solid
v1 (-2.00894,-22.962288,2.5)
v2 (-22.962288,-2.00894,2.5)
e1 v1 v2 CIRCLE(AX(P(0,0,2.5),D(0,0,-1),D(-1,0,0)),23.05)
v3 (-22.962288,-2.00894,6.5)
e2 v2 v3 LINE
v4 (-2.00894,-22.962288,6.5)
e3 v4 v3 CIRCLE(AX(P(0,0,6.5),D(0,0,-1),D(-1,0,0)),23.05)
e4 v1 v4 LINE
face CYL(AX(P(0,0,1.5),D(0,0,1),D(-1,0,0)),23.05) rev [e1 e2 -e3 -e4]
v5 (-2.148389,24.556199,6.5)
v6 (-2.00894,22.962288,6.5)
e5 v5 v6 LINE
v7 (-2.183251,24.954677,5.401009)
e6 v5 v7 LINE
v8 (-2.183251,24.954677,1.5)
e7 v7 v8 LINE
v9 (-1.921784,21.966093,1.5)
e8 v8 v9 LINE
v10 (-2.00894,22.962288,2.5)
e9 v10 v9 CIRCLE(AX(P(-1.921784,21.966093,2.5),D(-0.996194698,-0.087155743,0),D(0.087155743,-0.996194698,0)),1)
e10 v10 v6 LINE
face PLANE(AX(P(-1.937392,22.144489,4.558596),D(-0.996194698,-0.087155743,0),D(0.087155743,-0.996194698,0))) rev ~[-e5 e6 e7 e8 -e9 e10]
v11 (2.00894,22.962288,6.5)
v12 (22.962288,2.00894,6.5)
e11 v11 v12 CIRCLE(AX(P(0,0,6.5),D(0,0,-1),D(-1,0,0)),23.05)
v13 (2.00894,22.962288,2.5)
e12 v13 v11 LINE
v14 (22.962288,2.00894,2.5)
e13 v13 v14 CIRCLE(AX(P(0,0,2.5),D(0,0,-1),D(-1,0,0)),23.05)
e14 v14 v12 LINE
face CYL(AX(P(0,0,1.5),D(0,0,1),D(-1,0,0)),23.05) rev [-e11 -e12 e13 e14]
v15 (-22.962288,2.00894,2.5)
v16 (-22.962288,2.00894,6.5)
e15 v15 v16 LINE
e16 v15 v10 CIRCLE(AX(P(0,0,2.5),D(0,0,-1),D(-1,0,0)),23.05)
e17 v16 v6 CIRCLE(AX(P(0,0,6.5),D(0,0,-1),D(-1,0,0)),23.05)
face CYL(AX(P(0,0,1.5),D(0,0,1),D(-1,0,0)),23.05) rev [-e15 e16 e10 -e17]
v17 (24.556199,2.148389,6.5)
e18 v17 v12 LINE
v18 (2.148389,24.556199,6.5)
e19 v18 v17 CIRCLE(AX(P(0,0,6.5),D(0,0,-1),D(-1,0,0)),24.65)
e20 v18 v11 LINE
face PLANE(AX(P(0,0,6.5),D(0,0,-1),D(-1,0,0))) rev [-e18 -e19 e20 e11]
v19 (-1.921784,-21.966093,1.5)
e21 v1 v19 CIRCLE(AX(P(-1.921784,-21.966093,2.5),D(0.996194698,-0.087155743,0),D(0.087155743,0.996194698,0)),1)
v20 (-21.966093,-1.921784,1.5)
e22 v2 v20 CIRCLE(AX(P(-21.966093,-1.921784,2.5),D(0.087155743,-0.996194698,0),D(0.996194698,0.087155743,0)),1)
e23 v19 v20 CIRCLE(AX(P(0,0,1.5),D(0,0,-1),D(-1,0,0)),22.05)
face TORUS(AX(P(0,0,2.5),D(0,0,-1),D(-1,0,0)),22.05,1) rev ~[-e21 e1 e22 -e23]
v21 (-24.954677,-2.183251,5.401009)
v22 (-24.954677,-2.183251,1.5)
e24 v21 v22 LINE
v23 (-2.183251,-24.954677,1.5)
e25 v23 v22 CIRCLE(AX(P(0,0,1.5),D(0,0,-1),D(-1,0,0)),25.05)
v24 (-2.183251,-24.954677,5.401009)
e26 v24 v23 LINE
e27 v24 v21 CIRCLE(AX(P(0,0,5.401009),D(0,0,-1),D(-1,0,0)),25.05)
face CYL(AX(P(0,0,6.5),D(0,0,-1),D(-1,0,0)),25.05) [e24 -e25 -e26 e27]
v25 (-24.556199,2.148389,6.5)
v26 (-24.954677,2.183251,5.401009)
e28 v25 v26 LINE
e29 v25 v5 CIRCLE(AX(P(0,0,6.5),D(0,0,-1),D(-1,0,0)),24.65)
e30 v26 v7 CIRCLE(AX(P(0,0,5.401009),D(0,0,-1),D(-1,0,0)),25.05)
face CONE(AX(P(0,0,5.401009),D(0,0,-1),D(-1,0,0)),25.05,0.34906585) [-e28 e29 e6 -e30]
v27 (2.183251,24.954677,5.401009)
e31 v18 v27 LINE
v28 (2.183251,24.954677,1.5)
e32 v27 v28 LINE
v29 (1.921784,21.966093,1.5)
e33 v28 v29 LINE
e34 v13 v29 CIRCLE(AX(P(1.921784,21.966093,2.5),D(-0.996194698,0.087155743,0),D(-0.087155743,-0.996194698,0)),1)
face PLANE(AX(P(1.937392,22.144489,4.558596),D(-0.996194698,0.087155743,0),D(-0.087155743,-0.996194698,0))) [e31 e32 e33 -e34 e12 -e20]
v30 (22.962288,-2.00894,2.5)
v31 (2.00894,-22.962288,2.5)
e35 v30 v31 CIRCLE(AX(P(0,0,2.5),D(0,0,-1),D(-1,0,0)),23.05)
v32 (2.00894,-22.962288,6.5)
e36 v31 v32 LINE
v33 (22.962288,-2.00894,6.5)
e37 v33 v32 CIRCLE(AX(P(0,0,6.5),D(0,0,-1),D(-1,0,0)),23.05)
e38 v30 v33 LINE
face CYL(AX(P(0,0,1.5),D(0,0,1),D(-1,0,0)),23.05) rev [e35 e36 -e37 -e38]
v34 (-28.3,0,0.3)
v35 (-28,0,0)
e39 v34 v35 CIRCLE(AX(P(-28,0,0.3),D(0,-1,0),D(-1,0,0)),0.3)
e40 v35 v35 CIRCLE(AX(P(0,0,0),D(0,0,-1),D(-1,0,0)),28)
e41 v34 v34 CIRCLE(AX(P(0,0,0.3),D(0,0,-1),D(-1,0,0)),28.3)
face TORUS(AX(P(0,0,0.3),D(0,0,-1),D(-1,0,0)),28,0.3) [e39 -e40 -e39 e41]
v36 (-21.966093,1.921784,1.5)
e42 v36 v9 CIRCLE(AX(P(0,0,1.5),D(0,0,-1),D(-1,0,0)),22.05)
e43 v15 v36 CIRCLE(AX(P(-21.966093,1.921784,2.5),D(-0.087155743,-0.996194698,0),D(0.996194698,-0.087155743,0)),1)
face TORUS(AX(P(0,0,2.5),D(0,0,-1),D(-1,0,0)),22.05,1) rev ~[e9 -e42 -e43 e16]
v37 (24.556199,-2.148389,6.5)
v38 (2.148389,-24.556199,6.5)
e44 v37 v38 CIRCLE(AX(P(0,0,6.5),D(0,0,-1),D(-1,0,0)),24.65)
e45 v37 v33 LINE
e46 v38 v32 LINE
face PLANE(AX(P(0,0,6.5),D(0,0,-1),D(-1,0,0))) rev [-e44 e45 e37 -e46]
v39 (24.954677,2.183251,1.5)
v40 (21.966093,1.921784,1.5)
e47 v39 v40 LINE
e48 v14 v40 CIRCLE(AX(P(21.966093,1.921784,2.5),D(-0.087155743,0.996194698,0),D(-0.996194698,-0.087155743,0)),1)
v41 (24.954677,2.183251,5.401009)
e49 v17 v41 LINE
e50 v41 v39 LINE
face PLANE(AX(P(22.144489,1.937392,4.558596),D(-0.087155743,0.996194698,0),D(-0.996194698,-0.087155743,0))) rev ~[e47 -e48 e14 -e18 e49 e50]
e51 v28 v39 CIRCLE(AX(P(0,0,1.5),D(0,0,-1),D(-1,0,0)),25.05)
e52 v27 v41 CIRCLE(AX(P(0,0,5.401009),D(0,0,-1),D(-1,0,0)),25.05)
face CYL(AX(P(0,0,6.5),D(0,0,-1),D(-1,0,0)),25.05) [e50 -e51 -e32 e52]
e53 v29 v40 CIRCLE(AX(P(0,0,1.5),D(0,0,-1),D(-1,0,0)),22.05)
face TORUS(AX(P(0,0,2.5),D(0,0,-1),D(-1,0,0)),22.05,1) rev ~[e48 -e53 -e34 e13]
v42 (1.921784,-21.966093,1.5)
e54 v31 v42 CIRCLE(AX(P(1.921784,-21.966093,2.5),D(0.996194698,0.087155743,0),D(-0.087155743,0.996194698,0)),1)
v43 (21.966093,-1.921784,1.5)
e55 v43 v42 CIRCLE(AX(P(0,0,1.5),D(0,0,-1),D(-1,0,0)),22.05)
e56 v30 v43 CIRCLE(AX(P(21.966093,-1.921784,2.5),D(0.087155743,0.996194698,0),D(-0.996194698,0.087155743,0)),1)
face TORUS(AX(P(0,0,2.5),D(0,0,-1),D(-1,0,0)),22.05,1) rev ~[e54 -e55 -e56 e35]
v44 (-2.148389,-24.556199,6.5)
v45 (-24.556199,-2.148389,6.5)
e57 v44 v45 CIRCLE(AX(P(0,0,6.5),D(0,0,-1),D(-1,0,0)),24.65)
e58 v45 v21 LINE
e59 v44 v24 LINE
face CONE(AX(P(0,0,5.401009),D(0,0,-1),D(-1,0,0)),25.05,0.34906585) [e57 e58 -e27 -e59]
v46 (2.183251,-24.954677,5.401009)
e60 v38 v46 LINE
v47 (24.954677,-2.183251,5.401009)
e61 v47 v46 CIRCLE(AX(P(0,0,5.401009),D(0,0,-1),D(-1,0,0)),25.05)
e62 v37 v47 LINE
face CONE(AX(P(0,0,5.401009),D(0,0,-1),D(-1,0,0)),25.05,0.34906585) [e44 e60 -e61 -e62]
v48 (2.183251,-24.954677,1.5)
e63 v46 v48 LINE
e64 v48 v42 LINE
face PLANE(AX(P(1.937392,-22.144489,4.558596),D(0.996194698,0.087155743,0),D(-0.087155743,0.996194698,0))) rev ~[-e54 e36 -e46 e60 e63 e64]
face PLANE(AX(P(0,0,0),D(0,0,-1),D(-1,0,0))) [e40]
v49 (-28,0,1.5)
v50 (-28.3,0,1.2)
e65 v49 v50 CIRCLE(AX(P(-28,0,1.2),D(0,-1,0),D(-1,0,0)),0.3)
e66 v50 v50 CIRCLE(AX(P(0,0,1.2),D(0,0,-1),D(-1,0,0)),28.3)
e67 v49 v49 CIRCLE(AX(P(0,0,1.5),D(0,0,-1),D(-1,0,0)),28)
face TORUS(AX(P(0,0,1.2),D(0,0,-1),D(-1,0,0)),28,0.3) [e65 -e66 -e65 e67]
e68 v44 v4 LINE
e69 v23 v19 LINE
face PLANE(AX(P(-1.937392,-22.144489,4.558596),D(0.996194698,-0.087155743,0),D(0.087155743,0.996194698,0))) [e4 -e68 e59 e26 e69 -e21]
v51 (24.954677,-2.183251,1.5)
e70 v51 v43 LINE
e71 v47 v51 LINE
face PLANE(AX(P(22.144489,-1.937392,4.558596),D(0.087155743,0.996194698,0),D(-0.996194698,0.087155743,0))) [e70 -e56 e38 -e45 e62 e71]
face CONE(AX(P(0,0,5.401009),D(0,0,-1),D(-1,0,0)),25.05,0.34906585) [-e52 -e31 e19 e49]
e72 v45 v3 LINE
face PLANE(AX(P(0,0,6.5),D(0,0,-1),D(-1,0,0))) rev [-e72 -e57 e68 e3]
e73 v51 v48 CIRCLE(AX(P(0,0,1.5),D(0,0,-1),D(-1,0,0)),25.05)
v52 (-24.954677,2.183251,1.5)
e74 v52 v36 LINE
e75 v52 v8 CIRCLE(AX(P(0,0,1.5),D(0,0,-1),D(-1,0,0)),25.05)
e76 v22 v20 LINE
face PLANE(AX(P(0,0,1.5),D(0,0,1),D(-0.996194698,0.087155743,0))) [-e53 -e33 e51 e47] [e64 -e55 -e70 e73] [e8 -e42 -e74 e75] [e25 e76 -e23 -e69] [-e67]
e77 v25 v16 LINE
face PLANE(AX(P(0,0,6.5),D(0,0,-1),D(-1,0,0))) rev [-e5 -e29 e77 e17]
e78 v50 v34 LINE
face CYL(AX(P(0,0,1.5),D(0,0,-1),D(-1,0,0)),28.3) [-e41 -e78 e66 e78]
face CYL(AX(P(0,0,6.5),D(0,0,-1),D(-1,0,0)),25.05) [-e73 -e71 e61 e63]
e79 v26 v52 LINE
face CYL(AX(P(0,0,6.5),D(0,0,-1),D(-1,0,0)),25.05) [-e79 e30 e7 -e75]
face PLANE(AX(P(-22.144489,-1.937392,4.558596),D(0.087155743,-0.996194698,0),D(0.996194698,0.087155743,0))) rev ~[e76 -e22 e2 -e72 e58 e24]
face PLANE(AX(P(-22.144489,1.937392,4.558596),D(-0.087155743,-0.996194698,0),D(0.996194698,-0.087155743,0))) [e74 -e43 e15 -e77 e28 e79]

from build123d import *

# Parameters (mm, degrees)
F2_SIZE2        = 1.0989909678
F2_SIZE         = 0.4
F4_R            = 1
F3_W            = 7.3154903948
F3_H            = 6.1171914935
F5_ANGLE_BACK   = 5
F5_ANGLE        = 10
F5_COPIES_COUNT = 4
F6_R            = 0.3


# Not quite as in the source:
# - a pattern or mirror of a feature is missing from the dataset's text; its kind, count and spacing are read off the source's solid


with BuildPart() as f1:
    # F0 (on Front) → F1 (revolve)
    with BuildSketch(Plane.XZ):
        Polygon((-28.3, 0), (0, 0), (0, 1.5), (-23.05, 1.5), (-23.05, 6.5), (-25.05, 6.5), (-25.05, 1.5), (-28.3, 1.5), align=None)
    revolve(axis=Axis((0, 0, -0.5399994552), (0, 0, -1)))

    # F2
    f2_edges = [f1.edges().sort_by_distance(p)[0] for p in [
        (25.05, 0, 6.5),
    ]]
    chamfer(f2_edges, length=F2_SIZE, length2=F2_SIZE2)

    # F4
    f4_edges = [f1.edges().sort_by_distance(p)[0] for p in [
        (23.05, 0, 1.5),
    ]]
    fillet(f4_edges, radius=F4_R)

    # F3 (on Front) → F5 (revolve, cut)
    with BuildSketch(Plane.XZ, mode=Mode.PRIVATE) as f5_sk:
        with Locations((-22.2290772945, 4.5585957468)):
            Rectangle(F3_W, F3_H)
    f5 = revolve(f5_sk.sketch.rotate(Axis((0, 0, 7.0531656966), (0, 0, 1)), -F5_ANGLE_BACK), axis=Axis((0, 0, 7.0531656966), (0, 0, 1)), revolution_arc=F5_ANGLE, mode=Mode.SUBTRACT)

    # F5_copies: F5 ×4 about axis
    f5_copies_axis = Axis((0, 0, 0), (0, 0, 1))
    for i in range(1, F5_COPIES_COUNT):
        add(f5.rotate(f5_copies_axis, i * 360 / F5_COPIES_COUNT), mode=Mode.SUBTRACT)

    # F6
    f6_edges = [f1.edges().sort_by_distance(p)[0] for p in [
        (28.3, 0, 1.5),
        (28.3, 0, 0),
    ]]
    fillet(f6_edges, radius=F6_R)


solid = f1.part
